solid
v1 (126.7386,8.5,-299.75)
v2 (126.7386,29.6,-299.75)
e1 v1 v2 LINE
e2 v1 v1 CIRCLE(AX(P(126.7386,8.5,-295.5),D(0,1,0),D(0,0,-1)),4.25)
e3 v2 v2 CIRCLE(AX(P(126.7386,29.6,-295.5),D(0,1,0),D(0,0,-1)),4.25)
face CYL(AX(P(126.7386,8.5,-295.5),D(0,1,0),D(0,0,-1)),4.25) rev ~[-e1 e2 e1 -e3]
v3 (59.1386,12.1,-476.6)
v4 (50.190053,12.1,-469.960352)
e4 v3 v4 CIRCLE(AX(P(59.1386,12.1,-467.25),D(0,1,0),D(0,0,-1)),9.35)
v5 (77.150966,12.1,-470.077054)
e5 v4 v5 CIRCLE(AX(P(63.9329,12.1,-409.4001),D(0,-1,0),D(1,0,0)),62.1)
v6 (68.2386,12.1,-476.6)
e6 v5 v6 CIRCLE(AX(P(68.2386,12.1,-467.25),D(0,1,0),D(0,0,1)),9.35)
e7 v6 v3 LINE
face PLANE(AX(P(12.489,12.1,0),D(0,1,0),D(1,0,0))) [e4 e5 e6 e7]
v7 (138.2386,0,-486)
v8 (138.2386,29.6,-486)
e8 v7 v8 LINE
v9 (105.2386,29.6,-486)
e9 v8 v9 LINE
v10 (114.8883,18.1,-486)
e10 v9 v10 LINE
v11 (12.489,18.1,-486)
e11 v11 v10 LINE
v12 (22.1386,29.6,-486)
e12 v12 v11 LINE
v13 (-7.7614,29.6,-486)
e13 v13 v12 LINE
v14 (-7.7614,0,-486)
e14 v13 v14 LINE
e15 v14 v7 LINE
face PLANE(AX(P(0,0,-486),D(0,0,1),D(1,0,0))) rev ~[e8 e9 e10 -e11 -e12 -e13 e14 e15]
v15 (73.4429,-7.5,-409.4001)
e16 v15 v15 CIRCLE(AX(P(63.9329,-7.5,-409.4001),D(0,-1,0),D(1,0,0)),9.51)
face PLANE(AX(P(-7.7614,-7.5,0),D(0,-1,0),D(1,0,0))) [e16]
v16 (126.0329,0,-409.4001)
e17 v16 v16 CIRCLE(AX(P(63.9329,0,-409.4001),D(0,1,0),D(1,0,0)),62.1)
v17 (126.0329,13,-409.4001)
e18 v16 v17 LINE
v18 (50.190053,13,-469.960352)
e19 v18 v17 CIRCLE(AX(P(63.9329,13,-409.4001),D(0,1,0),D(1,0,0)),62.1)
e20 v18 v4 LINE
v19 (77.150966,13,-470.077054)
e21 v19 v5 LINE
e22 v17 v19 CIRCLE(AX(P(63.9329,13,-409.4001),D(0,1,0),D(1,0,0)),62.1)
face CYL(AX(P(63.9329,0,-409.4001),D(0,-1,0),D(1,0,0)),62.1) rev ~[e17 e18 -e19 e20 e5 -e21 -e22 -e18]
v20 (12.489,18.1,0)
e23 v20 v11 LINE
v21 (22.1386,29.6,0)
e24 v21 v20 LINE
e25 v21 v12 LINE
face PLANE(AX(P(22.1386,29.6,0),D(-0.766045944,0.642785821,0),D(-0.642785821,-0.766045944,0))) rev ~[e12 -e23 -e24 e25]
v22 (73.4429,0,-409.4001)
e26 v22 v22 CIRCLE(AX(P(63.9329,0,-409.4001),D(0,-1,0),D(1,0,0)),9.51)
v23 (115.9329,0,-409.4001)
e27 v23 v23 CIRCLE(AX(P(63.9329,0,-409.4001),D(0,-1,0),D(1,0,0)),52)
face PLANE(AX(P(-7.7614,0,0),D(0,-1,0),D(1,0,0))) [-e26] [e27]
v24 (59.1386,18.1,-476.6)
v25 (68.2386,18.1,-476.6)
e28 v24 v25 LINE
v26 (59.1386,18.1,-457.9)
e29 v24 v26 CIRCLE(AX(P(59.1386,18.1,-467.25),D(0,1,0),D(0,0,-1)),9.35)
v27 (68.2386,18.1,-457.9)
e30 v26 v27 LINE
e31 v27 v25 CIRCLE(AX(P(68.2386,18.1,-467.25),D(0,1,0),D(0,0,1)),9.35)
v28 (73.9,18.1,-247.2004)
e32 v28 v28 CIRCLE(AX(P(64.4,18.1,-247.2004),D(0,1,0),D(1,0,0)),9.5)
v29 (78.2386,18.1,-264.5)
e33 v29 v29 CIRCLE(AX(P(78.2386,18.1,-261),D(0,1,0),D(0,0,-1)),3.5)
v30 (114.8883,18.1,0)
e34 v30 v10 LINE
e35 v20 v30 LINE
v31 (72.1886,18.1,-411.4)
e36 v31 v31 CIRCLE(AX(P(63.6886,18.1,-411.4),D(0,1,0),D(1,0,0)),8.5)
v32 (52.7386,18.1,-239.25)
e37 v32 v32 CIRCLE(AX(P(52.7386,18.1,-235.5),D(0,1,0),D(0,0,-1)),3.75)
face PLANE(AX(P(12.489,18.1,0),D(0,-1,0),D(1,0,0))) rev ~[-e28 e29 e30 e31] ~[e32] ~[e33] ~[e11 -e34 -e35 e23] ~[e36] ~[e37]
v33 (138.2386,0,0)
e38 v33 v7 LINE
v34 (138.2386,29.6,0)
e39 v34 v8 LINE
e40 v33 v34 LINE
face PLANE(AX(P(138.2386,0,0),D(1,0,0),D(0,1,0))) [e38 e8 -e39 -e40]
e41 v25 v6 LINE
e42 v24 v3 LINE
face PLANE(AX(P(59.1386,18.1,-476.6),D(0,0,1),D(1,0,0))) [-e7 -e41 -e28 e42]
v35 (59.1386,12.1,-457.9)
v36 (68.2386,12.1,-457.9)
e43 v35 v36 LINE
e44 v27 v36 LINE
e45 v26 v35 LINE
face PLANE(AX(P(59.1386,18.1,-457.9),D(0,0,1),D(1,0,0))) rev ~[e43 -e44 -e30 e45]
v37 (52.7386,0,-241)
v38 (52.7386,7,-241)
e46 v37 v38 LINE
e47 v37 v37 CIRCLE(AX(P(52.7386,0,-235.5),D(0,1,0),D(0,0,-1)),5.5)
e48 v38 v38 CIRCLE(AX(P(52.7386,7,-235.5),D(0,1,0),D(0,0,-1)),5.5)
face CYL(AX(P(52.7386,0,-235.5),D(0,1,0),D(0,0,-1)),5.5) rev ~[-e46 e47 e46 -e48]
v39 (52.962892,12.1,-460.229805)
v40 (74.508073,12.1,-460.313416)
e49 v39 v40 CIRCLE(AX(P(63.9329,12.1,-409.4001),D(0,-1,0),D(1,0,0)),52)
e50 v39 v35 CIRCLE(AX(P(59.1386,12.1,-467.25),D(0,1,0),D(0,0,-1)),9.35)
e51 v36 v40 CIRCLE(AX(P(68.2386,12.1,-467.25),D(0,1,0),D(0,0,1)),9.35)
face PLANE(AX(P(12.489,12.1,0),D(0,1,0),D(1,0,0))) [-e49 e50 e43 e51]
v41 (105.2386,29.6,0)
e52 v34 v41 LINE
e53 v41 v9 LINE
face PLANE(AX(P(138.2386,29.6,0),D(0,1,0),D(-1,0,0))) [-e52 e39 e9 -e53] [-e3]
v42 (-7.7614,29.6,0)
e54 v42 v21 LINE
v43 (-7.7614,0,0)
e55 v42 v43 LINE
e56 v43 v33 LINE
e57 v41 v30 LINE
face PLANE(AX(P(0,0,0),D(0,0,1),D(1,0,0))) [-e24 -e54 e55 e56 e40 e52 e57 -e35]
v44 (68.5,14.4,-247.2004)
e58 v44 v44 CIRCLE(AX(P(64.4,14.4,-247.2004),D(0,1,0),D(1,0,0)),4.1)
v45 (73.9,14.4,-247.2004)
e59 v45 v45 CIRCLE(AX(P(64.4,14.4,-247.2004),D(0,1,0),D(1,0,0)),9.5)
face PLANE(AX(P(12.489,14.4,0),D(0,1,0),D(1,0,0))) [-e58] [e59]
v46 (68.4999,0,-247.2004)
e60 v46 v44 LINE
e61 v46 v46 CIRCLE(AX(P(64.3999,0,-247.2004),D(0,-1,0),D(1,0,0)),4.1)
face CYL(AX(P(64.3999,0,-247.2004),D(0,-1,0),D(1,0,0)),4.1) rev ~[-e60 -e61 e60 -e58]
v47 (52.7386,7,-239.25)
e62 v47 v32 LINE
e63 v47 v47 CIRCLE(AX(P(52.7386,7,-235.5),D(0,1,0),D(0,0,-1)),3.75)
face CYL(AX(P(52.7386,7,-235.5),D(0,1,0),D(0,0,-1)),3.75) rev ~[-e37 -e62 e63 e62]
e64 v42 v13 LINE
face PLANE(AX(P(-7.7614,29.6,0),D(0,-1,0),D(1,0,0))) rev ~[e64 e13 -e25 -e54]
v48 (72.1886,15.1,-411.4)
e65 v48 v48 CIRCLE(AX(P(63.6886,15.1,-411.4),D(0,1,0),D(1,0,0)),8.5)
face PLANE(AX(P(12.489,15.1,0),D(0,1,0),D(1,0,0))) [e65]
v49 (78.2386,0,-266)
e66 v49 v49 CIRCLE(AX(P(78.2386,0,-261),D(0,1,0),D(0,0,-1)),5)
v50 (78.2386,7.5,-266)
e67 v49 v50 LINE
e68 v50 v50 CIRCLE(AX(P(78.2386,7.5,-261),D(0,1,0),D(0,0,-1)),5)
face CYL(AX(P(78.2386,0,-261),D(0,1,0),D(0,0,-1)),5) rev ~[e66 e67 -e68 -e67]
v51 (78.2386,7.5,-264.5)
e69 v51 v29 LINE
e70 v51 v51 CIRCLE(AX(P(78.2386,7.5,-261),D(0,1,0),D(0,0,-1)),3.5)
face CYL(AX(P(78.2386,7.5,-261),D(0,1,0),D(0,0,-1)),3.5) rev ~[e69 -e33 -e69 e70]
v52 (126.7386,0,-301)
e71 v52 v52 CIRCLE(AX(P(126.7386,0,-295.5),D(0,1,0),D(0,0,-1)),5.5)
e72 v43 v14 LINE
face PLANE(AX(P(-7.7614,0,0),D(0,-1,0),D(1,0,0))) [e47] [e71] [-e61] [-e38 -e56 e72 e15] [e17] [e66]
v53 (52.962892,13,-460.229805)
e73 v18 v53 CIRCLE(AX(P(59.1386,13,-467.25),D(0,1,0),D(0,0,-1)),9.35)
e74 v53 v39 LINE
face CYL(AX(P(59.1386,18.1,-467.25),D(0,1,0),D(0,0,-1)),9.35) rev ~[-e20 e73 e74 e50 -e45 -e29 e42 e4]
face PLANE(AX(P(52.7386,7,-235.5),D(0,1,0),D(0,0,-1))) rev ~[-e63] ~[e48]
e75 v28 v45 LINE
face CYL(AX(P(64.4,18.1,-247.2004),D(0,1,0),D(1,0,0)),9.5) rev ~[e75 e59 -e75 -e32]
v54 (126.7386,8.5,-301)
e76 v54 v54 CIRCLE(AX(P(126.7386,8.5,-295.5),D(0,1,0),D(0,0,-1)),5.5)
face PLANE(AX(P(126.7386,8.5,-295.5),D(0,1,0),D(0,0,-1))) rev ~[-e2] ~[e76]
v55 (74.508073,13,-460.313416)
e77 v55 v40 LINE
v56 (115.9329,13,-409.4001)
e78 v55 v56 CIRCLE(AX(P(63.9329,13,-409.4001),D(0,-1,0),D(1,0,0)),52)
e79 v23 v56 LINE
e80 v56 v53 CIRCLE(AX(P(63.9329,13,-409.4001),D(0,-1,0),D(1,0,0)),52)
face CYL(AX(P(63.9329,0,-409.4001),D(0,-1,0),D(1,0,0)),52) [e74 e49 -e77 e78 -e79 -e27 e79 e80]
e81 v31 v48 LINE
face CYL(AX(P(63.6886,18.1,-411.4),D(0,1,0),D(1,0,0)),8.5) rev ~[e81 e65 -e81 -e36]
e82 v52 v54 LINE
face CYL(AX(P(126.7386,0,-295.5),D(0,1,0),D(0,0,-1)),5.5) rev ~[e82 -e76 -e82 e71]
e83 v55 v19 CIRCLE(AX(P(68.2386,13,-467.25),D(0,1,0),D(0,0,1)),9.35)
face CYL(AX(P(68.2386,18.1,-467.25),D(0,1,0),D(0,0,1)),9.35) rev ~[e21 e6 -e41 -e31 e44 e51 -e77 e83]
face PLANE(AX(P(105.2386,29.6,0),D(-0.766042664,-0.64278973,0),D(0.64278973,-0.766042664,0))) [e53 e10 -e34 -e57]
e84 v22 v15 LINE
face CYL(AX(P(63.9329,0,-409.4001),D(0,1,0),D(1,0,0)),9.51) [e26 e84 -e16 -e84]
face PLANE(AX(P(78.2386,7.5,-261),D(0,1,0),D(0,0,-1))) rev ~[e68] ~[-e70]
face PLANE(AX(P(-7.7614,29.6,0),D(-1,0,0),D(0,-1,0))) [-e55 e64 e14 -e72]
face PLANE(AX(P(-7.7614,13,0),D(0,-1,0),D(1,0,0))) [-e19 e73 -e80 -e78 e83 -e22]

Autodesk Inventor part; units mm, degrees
ref_plane "YZ Plane" through (0, 0, 0) normal (1, 0, 0) x (0, 1, 0)
ref_plane "XZ Plane" through (0, 0, 0) normal (0, 1, 0) x (-1, 0, 0)
ref_plane "XY Plane" through (0, 0, 0) normal (0, 0, 1) x (1, 0, 0)
sketch "Sketch1" plane through (0, 0, 0) normal (0, 0, 1) x (1, 0, 0)
  line L0 (-7.7614, 0) -> (138.2386, 0)
  line L1 (138.2386, 0) -> (138.2386, 29.6)
  line L2 (-7.7614, 29.6) -> (-7.7614, 0)
  line L3 (-7.7614, 29.6) -> (22.1386, 29.6)
  line L4 (12.489, 18.1) -> (114.8883, 18.1)
  line L5 (22.1386, 29.6) -> (12.489, 18.1)
  line L6 (22.1386, 29.6) -> (41.4586, 29.6) construction
  line L7 (138.2386, 29.6) -> (105.2386, 29.6)
  line L8 (105.2386, 29.6) -> (114.8883, 18.1)
  point P0 (0, 0)
  dimension "d0" = 146
  dimension "d1" = 29.6
  dimension "d2" = 29.9
  dimension "d4" = 130
  dimension "d5" = 33
  dimension "d6" = 50
extrude "Extrusion1" add sketch "Sketch1" against normal blind 486
sketch "Sketch2" plane through (-7.7614, 29.6, 0) normal (0, 1, 0) x (1, 0, 0)
  line L0 (113, 0) -> (122.6496, 0) projected
  line L1 (124, 486) -> (113, 0)
  line L2 (113, 0) -> (113, 486) projected
  line L3 (113, 486) -> (124, 486)
  line L4 (122.6496, 0) -> (122.6496, 486) projected
  line L5 (113, 486) -> (113, 0)
  line L6 (146, 0) -> (146, 486) projected
  point P0 (7.7614, 0)
  dimension "d9" = 22
sketch "Sketch3" plane through (-7.7614, 0, 0) normal (0, -1, 0) x (1, 0, 0)
  line L0 (20.2504, -486) -> (122.6496, -486) projected
  line L1 (0, 0) -> (146, 0) projected
  circle A0 centre (71.6943, -409.4001) radius 62.1
  line L2 (71.45, -486) -> (71.4962, -471.5001)
  circle A1 centre (71.6943, -409.4001) radius 52
  circle A2 centre (71.6943, -409.4001) radius 9.51
  circle A3 centre (72.1613, -247.2004) radius 4.1
  point P0 (7.7614, 0)
  dimension "d10" = 124.2
  dimension "d11" = 14.5
  dimension "d12" = 62.1
  dimension "d13" = 104
  dimension "d14" = 19.02
  dimension "d15" = 8.2
extrude "Extrusion2" cut sketch "Sketch3" against normal blind 13 contours A0
extrude "Extrusion3" add sketch "Sketch3" along normal blind 7.5 contours A2
extrude "Extrusion4" cut sketch "Sketch3" against normal through all contours A3
sketch "Sketch4" plane through (12.489, 18.1, 0) normal (0, 1, 0) x (1, 0, 0)
  circle A0 centre (51.911, 247.2004) radius 4.1 projected
  circle A1 centre (51.911, 247.2004) radius 9.5
  line L0 (0, 486) -> (102.3993, 486) projected
  line L1 (51.1996, 486) -> (51.1996, 476.6)
  arc A2 (46.6496, 476.6) -> (46.6496, 457.9) centre (46.6496, 467.25) ccw
  arc A3 (55.7496, 457.9) -> (55.7496, 476.6) centre (55.7496, 467.25) ccw
  line L2 (46.6496, 476.6) -> (55.7496, 476.6)
  line L3 (46.6496, 457.9) -> (55.7496, 457.9)
  circle A4 centre (51.1996, 411.4) radius 8.5
  point P0 (-12.489, 0)
  point P1 (51.1996, 476.6)
  dimension "d23" = 19
  dimension "d26" = 9.4
  dimension "d29" = 0
  dimension "d30" = 18.7
  dimension "d31" = 18.7
  dimension "d38" = 17
  dimension "d39" = 46.5
extrude "Extrusion5" cut sketch "Sketch4" against normal blind 3.7 contours A1
extrude "Extrusion7" cut sketch "Sketch4" against normal blind 6 contours L2 A3 L3 A2
extrude "Extrusion8" cut sketch "Sketch4" against normal blind 3 contours A4
sketch "Sketch5" plane through (-7.7614, 0, 0) normal (0, -1, 0) x (1, 0, 0)
  point P0 (7.7614, 0)
sketch "Sketch6" plane through (-7.7614, 0, 0) normal (0, -1, 0) x (1, 0, 0)
  circle A0 centre (86, -261) radius 5
  line L0 (146, -486) -> (0, -486) projected
  line L1 (146, 0) -> (146, -486) projected
  circle A1 centre (60.5, -235.5) radius 5.5
  line L2 (0, 0) -> (0, -486) projected
  circle A2 centre (134.5, -295.5) radius 5.5
  point P0 (7.7614, 0)
  dimension "d42" = 10
  dimension "d43" = 225
  dimension "d44" = 60
  dimension "d45" = 11
  dimension "d46" = 60.5
  dimension "d47" = 250.5
  dimension "d48" = 11
  dimension "d49" = 190.5
  dimension "d50" = 11.5
hole "Hole1" at (126.7386, 0, -295.5) direction (0, 1, 0) diameter 8.5 end through all counterbore diameter 11 counterbore depth 8.5
hole "Hole2" at (78.2386, 0, -261) direction (0, 1, 0) diameter 7 end through all counterbore diameter 10 counterbore depth 7.5
hole "Hole3" at (52.7386, 0, -235.5) direction (0, 1, 0) diameter 7.5 end through all counterbore diameter 11 counterbore depth 7
thread "Thread1" size "M9x1.25" class "6H" standard "ANSI Metric M Profile" full length
properties part number "slide ontop of saddle"
